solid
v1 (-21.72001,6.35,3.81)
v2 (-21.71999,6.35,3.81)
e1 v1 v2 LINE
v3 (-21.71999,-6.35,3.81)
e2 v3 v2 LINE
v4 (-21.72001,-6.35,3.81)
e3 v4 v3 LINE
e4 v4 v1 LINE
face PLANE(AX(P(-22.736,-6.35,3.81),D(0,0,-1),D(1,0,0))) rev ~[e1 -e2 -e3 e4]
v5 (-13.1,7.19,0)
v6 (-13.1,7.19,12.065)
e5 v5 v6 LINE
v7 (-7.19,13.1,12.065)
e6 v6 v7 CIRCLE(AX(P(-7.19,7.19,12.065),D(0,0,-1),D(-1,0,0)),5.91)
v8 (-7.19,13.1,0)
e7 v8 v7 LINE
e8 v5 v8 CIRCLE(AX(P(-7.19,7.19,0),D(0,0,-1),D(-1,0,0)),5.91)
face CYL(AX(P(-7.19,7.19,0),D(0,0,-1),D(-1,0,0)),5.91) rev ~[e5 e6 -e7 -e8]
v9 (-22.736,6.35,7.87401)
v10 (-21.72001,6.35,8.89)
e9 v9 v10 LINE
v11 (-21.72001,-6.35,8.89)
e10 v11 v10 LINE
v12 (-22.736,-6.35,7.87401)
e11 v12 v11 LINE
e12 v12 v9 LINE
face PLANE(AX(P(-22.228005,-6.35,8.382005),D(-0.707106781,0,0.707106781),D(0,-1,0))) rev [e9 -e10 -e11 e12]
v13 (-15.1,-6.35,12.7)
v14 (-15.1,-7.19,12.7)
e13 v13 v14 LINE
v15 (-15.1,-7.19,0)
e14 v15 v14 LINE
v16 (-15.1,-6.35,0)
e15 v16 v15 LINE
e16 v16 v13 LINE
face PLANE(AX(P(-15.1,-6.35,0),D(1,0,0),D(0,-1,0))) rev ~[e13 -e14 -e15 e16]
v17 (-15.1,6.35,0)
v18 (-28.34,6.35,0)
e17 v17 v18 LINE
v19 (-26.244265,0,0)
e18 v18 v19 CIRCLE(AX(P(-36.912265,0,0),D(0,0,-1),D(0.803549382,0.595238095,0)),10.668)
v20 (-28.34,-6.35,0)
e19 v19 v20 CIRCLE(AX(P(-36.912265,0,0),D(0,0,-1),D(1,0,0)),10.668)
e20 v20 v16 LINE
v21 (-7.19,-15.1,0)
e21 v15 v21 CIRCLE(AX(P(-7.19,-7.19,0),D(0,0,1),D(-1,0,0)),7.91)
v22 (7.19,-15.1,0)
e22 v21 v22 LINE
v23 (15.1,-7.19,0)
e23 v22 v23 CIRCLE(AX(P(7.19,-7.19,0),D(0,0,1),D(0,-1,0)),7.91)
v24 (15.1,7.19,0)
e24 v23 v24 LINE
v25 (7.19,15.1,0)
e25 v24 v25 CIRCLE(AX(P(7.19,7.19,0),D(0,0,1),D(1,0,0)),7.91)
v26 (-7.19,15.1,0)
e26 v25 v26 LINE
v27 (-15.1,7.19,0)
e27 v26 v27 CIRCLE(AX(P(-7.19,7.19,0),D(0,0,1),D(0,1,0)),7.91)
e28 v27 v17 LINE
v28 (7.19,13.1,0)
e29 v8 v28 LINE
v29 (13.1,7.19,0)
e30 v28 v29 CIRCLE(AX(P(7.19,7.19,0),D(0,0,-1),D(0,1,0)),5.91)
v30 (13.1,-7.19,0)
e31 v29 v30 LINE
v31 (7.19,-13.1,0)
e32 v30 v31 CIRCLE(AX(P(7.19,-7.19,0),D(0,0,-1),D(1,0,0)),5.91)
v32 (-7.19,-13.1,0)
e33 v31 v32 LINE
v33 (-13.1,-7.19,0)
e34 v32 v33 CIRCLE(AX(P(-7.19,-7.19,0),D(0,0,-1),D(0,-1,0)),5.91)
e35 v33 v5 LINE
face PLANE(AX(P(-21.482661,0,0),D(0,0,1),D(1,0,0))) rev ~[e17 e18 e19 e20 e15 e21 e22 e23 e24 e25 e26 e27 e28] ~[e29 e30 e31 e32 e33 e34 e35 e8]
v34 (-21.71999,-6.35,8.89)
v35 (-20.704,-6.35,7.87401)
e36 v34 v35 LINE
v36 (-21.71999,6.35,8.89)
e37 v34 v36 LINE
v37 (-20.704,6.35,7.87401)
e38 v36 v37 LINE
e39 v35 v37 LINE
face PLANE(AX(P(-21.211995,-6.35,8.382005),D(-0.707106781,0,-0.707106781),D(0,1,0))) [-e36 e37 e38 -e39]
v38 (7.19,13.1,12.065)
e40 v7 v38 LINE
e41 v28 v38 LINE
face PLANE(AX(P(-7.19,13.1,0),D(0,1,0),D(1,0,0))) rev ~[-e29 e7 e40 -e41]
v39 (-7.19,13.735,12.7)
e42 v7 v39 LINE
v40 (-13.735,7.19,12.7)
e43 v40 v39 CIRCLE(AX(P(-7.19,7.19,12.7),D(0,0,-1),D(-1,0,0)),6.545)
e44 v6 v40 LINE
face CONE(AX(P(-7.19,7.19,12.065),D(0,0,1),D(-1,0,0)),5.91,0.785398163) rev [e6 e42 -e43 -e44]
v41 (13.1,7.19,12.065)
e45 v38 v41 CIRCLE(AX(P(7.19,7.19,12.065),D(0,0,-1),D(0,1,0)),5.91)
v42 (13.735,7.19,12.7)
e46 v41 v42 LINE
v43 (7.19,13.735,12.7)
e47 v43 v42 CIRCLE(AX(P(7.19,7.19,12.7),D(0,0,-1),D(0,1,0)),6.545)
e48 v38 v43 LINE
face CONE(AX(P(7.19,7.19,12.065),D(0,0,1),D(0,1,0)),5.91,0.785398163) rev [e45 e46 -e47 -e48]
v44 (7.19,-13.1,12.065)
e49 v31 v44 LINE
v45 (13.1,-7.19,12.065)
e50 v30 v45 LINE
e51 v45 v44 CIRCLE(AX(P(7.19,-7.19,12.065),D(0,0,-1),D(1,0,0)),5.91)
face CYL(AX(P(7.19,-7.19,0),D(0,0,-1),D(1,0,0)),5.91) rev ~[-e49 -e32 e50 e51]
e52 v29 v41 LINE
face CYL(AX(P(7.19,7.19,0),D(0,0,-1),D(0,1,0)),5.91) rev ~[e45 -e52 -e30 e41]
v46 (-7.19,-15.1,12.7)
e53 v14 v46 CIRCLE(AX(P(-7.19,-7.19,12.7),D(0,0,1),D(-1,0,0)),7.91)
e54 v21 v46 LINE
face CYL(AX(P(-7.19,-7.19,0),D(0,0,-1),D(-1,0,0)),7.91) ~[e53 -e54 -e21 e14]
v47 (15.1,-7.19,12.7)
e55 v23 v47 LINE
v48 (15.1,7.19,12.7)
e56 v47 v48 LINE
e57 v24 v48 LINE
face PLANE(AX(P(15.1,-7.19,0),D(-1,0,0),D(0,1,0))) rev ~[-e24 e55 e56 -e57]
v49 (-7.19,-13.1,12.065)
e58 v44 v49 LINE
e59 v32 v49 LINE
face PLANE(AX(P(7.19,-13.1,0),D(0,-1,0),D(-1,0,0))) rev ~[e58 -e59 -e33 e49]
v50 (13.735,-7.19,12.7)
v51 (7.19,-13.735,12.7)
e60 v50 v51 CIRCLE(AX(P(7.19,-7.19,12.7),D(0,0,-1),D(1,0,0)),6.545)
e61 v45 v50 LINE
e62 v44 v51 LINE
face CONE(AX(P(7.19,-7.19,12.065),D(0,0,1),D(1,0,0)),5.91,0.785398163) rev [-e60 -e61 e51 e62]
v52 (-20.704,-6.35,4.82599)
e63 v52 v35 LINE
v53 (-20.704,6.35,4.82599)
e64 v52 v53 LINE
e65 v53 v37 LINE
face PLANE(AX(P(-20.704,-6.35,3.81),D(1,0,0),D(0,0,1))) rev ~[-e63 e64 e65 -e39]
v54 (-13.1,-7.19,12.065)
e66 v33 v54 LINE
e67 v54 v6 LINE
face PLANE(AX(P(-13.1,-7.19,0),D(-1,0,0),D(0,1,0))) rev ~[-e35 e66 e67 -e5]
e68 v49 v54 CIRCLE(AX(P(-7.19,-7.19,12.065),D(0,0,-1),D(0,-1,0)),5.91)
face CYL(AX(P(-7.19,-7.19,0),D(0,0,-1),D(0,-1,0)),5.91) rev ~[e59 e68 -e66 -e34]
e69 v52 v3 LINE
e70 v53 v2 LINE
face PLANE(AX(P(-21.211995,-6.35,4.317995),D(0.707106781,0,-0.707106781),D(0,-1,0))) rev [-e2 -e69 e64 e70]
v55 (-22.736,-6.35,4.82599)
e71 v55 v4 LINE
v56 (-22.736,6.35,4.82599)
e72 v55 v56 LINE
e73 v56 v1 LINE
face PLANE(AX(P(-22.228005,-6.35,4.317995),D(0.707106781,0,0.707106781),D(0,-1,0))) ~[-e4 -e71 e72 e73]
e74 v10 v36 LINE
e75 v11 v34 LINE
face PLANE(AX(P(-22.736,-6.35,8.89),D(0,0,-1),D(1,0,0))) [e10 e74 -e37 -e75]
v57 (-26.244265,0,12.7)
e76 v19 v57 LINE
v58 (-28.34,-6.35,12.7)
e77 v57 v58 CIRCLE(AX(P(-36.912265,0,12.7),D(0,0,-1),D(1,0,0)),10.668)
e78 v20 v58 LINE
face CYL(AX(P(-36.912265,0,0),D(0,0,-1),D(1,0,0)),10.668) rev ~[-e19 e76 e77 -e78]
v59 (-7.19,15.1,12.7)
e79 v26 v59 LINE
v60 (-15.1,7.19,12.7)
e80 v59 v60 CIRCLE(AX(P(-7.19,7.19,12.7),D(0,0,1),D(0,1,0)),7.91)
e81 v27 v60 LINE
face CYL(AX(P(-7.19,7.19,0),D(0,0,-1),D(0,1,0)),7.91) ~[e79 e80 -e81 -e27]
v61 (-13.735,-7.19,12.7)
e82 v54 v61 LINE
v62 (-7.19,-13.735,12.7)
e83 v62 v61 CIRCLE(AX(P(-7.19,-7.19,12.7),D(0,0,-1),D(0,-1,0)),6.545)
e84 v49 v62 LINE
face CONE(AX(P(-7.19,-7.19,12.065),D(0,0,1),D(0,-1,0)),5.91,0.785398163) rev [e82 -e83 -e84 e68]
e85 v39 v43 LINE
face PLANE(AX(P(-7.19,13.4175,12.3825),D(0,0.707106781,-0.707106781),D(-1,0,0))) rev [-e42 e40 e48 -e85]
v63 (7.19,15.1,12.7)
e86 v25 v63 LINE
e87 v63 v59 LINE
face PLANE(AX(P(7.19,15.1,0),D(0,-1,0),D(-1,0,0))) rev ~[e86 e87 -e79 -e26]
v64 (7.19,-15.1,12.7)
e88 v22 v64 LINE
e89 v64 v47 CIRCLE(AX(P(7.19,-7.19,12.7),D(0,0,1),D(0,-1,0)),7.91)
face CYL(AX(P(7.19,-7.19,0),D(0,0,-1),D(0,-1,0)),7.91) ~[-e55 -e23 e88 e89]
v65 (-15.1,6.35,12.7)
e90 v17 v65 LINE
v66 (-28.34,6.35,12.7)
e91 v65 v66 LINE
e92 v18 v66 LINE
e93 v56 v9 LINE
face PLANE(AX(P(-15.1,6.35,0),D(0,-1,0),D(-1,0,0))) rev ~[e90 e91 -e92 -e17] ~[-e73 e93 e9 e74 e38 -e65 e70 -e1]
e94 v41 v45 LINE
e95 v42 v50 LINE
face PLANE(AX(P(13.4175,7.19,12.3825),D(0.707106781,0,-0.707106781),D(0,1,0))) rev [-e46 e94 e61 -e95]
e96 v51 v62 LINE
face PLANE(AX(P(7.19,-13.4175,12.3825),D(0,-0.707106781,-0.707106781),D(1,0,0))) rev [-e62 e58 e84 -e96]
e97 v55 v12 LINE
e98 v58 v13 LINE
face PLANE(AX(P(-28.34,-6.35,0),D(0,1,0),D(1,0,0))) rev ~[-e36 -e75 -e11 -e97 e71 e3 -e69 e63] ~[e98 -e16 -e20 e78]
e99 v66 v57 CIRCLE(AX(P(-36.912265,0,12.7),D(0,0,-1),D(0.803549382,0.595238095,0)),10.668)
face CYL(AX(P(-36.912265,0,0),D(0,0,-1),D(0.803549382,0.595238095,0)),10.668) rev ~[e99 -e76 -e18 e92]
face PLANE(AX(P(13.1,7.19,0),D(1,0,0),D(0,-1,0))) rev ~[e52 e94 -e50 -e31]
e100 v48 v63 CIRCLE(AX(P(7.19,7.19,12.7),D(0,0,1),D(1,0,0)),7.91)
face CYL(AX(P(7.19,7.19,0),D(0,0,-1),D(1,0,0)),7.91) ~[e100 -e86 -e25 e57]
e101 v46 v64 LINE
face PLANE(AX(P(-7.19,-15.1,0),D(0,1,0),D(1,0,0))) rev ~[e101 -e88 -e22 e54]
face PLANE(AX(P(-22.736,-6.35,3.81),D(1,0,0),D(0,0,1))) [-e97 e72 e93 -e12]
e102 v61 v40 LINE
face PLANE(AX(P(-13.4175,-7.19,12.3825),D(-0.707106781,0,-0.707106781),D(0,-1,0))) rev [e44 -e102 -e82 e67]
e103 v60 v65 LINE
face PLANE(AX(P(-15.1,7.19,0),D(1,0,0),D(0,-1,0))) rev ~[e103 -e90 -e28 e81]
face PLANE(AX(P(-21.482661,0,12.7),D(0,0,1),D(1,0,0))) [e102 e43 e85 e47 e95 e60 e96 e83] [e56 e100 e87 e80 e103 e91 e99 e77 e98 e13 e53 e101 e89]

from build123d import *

# Parameters (mm, degrees)
F0_W     = 2
F0_H     = 12.7
F1_DEPTH = 12.7
F2_SIZE  = 0.635
F3_W     = 2.032
F3_H     = 5.08
F4_DEPTH = 25.4
F5_SIZE  = 1.01599


# Not quite as in the source:
# - a fillet or chamfer is up to 0.001 mm smaller than in the source, because OpenCascade refuses the exact size


with BuildPart() as f1:
    # F0 (on Top) → F1 (new body)
    with BuildSketch(Plane.XY):
        with BuildLine():
            Line((-15.1, -6.35), (-15.1, 6.35))
            Line((-15.1, 6.35), (-28.34, 6.35))
            ThreePointArc((-28.34, 6.35), (-26.7817380481, 3.3434490418), (-26.2442648116, 0))
            ThreePointArc((-26.2442648116, 0), (-26.7817380481, -3.3434490418), (-28.34, -6.35))
            Line((-28.34, -6.35), (-15.1, -6.35))
        make_face()
        with Locations((-14.1, 0)):
            Rectangle(F0_W, F0_H)
        with BuildLine():
            ThreePointArc((7.19, 13.1), (11.3690010768, 11.3690010768), (13.1, 7.19))
            Line((13.1, 7.19), (13.1, -7.19))
            ThreePointArc((13.1, -7.19), (11.3690010768, -11.3690010768), (7.19, -13.1))
            Line((7.19, -13.1), (-7.19, -13.1))
            ThreePointArc((-7.19, -13.1), (-11.3690010768, -11.3690010768), (-13.1, -7.19))
            Line((-13.1, -7.19), (-13.1, -6.35))
            Line((-13.1, -6.35), (-15.1, -6.35))
            Line((-15.1, -6.35), (-15.1, -7.19))
            ThreePointArc((-15.1, -7.19), (-12.7832146392, -12.7832146392), (-7.19, -15.1))
            Line((-7.19, -15.1), (7.19, -15.1))
            ThreePointArc((7.19, -15.1), (12.7832146392, -12.7832146392), (15.1, -7.19))
            Line((15.1, -7.19), (15.1, 7.19))
            ThreePointArc((15.1, 7.19), (12.7832146392, 12.7832146392), (7.19, 15.1))
            Line((7.19, 15.1), (-7.19, 15.1))
            ThreePointArc((-7.19, 15.1), (-12.7832146392, 12.7832146392), (-15.1, 7.19))
            Line((-15.1, 7.19), (-15.1, 6.35))
            Line((-15.1, 6.35), (-13.1, 6.35))
            Line((-13.1, 6.35), (-13.1, 7.19))
            ThreePointArc((-13.1, 7.19), (-11.3690010768, 11.3690010768), (-7.19, 13.1))
            Line((-7.19, 13.1), (7.19, 13.1))
        make_face()
    extrude(amount=F1_DEPTH)

    # F2
    f2_edges = [f1.edges().sort_by_distance(p)[0] for p in [
        (-11.369001, 11.369001, 12.7),
        (0, 13.1, 12.7),
        (11.369001, 11.369001, 12.7),
        (13.1, 0, 12.7),
        (11.369001, -11.369001, 12.7),
        (0, -13.1, 12.7),
        (-11.369001, -11.369001, 12.7),
        (-13.1, 0, 12.7),
    ]]
    chamfer(f2_edges, length=F2_SIZE)

    # F3 (on face) → F4 (cut)
    with BuildSketch(Plane.XZ.offset(6.35)):
        with Locations((-21.72, 6.35)):
            Rectangle(F3_W, F3_H)
    extrude(amount=-F4_DEPTH, mode=Mode.SUBTRACT)

    # F5 (size 1.016 in the source; OpenCascade refuses exactly that, so slightly less here)
    f5_edges = [f1.edges().sort_by_distance(p)[0] for p in [
        (-22.736, 0, 3.81),
        (-20.704, 0, 3.81),
        (-20.704, 0, 8.89),
        (-22.736, 0, 8.89),
    ]]
    chamfer(f5_edges, length=F5_SIZE)


solid = f1.part
